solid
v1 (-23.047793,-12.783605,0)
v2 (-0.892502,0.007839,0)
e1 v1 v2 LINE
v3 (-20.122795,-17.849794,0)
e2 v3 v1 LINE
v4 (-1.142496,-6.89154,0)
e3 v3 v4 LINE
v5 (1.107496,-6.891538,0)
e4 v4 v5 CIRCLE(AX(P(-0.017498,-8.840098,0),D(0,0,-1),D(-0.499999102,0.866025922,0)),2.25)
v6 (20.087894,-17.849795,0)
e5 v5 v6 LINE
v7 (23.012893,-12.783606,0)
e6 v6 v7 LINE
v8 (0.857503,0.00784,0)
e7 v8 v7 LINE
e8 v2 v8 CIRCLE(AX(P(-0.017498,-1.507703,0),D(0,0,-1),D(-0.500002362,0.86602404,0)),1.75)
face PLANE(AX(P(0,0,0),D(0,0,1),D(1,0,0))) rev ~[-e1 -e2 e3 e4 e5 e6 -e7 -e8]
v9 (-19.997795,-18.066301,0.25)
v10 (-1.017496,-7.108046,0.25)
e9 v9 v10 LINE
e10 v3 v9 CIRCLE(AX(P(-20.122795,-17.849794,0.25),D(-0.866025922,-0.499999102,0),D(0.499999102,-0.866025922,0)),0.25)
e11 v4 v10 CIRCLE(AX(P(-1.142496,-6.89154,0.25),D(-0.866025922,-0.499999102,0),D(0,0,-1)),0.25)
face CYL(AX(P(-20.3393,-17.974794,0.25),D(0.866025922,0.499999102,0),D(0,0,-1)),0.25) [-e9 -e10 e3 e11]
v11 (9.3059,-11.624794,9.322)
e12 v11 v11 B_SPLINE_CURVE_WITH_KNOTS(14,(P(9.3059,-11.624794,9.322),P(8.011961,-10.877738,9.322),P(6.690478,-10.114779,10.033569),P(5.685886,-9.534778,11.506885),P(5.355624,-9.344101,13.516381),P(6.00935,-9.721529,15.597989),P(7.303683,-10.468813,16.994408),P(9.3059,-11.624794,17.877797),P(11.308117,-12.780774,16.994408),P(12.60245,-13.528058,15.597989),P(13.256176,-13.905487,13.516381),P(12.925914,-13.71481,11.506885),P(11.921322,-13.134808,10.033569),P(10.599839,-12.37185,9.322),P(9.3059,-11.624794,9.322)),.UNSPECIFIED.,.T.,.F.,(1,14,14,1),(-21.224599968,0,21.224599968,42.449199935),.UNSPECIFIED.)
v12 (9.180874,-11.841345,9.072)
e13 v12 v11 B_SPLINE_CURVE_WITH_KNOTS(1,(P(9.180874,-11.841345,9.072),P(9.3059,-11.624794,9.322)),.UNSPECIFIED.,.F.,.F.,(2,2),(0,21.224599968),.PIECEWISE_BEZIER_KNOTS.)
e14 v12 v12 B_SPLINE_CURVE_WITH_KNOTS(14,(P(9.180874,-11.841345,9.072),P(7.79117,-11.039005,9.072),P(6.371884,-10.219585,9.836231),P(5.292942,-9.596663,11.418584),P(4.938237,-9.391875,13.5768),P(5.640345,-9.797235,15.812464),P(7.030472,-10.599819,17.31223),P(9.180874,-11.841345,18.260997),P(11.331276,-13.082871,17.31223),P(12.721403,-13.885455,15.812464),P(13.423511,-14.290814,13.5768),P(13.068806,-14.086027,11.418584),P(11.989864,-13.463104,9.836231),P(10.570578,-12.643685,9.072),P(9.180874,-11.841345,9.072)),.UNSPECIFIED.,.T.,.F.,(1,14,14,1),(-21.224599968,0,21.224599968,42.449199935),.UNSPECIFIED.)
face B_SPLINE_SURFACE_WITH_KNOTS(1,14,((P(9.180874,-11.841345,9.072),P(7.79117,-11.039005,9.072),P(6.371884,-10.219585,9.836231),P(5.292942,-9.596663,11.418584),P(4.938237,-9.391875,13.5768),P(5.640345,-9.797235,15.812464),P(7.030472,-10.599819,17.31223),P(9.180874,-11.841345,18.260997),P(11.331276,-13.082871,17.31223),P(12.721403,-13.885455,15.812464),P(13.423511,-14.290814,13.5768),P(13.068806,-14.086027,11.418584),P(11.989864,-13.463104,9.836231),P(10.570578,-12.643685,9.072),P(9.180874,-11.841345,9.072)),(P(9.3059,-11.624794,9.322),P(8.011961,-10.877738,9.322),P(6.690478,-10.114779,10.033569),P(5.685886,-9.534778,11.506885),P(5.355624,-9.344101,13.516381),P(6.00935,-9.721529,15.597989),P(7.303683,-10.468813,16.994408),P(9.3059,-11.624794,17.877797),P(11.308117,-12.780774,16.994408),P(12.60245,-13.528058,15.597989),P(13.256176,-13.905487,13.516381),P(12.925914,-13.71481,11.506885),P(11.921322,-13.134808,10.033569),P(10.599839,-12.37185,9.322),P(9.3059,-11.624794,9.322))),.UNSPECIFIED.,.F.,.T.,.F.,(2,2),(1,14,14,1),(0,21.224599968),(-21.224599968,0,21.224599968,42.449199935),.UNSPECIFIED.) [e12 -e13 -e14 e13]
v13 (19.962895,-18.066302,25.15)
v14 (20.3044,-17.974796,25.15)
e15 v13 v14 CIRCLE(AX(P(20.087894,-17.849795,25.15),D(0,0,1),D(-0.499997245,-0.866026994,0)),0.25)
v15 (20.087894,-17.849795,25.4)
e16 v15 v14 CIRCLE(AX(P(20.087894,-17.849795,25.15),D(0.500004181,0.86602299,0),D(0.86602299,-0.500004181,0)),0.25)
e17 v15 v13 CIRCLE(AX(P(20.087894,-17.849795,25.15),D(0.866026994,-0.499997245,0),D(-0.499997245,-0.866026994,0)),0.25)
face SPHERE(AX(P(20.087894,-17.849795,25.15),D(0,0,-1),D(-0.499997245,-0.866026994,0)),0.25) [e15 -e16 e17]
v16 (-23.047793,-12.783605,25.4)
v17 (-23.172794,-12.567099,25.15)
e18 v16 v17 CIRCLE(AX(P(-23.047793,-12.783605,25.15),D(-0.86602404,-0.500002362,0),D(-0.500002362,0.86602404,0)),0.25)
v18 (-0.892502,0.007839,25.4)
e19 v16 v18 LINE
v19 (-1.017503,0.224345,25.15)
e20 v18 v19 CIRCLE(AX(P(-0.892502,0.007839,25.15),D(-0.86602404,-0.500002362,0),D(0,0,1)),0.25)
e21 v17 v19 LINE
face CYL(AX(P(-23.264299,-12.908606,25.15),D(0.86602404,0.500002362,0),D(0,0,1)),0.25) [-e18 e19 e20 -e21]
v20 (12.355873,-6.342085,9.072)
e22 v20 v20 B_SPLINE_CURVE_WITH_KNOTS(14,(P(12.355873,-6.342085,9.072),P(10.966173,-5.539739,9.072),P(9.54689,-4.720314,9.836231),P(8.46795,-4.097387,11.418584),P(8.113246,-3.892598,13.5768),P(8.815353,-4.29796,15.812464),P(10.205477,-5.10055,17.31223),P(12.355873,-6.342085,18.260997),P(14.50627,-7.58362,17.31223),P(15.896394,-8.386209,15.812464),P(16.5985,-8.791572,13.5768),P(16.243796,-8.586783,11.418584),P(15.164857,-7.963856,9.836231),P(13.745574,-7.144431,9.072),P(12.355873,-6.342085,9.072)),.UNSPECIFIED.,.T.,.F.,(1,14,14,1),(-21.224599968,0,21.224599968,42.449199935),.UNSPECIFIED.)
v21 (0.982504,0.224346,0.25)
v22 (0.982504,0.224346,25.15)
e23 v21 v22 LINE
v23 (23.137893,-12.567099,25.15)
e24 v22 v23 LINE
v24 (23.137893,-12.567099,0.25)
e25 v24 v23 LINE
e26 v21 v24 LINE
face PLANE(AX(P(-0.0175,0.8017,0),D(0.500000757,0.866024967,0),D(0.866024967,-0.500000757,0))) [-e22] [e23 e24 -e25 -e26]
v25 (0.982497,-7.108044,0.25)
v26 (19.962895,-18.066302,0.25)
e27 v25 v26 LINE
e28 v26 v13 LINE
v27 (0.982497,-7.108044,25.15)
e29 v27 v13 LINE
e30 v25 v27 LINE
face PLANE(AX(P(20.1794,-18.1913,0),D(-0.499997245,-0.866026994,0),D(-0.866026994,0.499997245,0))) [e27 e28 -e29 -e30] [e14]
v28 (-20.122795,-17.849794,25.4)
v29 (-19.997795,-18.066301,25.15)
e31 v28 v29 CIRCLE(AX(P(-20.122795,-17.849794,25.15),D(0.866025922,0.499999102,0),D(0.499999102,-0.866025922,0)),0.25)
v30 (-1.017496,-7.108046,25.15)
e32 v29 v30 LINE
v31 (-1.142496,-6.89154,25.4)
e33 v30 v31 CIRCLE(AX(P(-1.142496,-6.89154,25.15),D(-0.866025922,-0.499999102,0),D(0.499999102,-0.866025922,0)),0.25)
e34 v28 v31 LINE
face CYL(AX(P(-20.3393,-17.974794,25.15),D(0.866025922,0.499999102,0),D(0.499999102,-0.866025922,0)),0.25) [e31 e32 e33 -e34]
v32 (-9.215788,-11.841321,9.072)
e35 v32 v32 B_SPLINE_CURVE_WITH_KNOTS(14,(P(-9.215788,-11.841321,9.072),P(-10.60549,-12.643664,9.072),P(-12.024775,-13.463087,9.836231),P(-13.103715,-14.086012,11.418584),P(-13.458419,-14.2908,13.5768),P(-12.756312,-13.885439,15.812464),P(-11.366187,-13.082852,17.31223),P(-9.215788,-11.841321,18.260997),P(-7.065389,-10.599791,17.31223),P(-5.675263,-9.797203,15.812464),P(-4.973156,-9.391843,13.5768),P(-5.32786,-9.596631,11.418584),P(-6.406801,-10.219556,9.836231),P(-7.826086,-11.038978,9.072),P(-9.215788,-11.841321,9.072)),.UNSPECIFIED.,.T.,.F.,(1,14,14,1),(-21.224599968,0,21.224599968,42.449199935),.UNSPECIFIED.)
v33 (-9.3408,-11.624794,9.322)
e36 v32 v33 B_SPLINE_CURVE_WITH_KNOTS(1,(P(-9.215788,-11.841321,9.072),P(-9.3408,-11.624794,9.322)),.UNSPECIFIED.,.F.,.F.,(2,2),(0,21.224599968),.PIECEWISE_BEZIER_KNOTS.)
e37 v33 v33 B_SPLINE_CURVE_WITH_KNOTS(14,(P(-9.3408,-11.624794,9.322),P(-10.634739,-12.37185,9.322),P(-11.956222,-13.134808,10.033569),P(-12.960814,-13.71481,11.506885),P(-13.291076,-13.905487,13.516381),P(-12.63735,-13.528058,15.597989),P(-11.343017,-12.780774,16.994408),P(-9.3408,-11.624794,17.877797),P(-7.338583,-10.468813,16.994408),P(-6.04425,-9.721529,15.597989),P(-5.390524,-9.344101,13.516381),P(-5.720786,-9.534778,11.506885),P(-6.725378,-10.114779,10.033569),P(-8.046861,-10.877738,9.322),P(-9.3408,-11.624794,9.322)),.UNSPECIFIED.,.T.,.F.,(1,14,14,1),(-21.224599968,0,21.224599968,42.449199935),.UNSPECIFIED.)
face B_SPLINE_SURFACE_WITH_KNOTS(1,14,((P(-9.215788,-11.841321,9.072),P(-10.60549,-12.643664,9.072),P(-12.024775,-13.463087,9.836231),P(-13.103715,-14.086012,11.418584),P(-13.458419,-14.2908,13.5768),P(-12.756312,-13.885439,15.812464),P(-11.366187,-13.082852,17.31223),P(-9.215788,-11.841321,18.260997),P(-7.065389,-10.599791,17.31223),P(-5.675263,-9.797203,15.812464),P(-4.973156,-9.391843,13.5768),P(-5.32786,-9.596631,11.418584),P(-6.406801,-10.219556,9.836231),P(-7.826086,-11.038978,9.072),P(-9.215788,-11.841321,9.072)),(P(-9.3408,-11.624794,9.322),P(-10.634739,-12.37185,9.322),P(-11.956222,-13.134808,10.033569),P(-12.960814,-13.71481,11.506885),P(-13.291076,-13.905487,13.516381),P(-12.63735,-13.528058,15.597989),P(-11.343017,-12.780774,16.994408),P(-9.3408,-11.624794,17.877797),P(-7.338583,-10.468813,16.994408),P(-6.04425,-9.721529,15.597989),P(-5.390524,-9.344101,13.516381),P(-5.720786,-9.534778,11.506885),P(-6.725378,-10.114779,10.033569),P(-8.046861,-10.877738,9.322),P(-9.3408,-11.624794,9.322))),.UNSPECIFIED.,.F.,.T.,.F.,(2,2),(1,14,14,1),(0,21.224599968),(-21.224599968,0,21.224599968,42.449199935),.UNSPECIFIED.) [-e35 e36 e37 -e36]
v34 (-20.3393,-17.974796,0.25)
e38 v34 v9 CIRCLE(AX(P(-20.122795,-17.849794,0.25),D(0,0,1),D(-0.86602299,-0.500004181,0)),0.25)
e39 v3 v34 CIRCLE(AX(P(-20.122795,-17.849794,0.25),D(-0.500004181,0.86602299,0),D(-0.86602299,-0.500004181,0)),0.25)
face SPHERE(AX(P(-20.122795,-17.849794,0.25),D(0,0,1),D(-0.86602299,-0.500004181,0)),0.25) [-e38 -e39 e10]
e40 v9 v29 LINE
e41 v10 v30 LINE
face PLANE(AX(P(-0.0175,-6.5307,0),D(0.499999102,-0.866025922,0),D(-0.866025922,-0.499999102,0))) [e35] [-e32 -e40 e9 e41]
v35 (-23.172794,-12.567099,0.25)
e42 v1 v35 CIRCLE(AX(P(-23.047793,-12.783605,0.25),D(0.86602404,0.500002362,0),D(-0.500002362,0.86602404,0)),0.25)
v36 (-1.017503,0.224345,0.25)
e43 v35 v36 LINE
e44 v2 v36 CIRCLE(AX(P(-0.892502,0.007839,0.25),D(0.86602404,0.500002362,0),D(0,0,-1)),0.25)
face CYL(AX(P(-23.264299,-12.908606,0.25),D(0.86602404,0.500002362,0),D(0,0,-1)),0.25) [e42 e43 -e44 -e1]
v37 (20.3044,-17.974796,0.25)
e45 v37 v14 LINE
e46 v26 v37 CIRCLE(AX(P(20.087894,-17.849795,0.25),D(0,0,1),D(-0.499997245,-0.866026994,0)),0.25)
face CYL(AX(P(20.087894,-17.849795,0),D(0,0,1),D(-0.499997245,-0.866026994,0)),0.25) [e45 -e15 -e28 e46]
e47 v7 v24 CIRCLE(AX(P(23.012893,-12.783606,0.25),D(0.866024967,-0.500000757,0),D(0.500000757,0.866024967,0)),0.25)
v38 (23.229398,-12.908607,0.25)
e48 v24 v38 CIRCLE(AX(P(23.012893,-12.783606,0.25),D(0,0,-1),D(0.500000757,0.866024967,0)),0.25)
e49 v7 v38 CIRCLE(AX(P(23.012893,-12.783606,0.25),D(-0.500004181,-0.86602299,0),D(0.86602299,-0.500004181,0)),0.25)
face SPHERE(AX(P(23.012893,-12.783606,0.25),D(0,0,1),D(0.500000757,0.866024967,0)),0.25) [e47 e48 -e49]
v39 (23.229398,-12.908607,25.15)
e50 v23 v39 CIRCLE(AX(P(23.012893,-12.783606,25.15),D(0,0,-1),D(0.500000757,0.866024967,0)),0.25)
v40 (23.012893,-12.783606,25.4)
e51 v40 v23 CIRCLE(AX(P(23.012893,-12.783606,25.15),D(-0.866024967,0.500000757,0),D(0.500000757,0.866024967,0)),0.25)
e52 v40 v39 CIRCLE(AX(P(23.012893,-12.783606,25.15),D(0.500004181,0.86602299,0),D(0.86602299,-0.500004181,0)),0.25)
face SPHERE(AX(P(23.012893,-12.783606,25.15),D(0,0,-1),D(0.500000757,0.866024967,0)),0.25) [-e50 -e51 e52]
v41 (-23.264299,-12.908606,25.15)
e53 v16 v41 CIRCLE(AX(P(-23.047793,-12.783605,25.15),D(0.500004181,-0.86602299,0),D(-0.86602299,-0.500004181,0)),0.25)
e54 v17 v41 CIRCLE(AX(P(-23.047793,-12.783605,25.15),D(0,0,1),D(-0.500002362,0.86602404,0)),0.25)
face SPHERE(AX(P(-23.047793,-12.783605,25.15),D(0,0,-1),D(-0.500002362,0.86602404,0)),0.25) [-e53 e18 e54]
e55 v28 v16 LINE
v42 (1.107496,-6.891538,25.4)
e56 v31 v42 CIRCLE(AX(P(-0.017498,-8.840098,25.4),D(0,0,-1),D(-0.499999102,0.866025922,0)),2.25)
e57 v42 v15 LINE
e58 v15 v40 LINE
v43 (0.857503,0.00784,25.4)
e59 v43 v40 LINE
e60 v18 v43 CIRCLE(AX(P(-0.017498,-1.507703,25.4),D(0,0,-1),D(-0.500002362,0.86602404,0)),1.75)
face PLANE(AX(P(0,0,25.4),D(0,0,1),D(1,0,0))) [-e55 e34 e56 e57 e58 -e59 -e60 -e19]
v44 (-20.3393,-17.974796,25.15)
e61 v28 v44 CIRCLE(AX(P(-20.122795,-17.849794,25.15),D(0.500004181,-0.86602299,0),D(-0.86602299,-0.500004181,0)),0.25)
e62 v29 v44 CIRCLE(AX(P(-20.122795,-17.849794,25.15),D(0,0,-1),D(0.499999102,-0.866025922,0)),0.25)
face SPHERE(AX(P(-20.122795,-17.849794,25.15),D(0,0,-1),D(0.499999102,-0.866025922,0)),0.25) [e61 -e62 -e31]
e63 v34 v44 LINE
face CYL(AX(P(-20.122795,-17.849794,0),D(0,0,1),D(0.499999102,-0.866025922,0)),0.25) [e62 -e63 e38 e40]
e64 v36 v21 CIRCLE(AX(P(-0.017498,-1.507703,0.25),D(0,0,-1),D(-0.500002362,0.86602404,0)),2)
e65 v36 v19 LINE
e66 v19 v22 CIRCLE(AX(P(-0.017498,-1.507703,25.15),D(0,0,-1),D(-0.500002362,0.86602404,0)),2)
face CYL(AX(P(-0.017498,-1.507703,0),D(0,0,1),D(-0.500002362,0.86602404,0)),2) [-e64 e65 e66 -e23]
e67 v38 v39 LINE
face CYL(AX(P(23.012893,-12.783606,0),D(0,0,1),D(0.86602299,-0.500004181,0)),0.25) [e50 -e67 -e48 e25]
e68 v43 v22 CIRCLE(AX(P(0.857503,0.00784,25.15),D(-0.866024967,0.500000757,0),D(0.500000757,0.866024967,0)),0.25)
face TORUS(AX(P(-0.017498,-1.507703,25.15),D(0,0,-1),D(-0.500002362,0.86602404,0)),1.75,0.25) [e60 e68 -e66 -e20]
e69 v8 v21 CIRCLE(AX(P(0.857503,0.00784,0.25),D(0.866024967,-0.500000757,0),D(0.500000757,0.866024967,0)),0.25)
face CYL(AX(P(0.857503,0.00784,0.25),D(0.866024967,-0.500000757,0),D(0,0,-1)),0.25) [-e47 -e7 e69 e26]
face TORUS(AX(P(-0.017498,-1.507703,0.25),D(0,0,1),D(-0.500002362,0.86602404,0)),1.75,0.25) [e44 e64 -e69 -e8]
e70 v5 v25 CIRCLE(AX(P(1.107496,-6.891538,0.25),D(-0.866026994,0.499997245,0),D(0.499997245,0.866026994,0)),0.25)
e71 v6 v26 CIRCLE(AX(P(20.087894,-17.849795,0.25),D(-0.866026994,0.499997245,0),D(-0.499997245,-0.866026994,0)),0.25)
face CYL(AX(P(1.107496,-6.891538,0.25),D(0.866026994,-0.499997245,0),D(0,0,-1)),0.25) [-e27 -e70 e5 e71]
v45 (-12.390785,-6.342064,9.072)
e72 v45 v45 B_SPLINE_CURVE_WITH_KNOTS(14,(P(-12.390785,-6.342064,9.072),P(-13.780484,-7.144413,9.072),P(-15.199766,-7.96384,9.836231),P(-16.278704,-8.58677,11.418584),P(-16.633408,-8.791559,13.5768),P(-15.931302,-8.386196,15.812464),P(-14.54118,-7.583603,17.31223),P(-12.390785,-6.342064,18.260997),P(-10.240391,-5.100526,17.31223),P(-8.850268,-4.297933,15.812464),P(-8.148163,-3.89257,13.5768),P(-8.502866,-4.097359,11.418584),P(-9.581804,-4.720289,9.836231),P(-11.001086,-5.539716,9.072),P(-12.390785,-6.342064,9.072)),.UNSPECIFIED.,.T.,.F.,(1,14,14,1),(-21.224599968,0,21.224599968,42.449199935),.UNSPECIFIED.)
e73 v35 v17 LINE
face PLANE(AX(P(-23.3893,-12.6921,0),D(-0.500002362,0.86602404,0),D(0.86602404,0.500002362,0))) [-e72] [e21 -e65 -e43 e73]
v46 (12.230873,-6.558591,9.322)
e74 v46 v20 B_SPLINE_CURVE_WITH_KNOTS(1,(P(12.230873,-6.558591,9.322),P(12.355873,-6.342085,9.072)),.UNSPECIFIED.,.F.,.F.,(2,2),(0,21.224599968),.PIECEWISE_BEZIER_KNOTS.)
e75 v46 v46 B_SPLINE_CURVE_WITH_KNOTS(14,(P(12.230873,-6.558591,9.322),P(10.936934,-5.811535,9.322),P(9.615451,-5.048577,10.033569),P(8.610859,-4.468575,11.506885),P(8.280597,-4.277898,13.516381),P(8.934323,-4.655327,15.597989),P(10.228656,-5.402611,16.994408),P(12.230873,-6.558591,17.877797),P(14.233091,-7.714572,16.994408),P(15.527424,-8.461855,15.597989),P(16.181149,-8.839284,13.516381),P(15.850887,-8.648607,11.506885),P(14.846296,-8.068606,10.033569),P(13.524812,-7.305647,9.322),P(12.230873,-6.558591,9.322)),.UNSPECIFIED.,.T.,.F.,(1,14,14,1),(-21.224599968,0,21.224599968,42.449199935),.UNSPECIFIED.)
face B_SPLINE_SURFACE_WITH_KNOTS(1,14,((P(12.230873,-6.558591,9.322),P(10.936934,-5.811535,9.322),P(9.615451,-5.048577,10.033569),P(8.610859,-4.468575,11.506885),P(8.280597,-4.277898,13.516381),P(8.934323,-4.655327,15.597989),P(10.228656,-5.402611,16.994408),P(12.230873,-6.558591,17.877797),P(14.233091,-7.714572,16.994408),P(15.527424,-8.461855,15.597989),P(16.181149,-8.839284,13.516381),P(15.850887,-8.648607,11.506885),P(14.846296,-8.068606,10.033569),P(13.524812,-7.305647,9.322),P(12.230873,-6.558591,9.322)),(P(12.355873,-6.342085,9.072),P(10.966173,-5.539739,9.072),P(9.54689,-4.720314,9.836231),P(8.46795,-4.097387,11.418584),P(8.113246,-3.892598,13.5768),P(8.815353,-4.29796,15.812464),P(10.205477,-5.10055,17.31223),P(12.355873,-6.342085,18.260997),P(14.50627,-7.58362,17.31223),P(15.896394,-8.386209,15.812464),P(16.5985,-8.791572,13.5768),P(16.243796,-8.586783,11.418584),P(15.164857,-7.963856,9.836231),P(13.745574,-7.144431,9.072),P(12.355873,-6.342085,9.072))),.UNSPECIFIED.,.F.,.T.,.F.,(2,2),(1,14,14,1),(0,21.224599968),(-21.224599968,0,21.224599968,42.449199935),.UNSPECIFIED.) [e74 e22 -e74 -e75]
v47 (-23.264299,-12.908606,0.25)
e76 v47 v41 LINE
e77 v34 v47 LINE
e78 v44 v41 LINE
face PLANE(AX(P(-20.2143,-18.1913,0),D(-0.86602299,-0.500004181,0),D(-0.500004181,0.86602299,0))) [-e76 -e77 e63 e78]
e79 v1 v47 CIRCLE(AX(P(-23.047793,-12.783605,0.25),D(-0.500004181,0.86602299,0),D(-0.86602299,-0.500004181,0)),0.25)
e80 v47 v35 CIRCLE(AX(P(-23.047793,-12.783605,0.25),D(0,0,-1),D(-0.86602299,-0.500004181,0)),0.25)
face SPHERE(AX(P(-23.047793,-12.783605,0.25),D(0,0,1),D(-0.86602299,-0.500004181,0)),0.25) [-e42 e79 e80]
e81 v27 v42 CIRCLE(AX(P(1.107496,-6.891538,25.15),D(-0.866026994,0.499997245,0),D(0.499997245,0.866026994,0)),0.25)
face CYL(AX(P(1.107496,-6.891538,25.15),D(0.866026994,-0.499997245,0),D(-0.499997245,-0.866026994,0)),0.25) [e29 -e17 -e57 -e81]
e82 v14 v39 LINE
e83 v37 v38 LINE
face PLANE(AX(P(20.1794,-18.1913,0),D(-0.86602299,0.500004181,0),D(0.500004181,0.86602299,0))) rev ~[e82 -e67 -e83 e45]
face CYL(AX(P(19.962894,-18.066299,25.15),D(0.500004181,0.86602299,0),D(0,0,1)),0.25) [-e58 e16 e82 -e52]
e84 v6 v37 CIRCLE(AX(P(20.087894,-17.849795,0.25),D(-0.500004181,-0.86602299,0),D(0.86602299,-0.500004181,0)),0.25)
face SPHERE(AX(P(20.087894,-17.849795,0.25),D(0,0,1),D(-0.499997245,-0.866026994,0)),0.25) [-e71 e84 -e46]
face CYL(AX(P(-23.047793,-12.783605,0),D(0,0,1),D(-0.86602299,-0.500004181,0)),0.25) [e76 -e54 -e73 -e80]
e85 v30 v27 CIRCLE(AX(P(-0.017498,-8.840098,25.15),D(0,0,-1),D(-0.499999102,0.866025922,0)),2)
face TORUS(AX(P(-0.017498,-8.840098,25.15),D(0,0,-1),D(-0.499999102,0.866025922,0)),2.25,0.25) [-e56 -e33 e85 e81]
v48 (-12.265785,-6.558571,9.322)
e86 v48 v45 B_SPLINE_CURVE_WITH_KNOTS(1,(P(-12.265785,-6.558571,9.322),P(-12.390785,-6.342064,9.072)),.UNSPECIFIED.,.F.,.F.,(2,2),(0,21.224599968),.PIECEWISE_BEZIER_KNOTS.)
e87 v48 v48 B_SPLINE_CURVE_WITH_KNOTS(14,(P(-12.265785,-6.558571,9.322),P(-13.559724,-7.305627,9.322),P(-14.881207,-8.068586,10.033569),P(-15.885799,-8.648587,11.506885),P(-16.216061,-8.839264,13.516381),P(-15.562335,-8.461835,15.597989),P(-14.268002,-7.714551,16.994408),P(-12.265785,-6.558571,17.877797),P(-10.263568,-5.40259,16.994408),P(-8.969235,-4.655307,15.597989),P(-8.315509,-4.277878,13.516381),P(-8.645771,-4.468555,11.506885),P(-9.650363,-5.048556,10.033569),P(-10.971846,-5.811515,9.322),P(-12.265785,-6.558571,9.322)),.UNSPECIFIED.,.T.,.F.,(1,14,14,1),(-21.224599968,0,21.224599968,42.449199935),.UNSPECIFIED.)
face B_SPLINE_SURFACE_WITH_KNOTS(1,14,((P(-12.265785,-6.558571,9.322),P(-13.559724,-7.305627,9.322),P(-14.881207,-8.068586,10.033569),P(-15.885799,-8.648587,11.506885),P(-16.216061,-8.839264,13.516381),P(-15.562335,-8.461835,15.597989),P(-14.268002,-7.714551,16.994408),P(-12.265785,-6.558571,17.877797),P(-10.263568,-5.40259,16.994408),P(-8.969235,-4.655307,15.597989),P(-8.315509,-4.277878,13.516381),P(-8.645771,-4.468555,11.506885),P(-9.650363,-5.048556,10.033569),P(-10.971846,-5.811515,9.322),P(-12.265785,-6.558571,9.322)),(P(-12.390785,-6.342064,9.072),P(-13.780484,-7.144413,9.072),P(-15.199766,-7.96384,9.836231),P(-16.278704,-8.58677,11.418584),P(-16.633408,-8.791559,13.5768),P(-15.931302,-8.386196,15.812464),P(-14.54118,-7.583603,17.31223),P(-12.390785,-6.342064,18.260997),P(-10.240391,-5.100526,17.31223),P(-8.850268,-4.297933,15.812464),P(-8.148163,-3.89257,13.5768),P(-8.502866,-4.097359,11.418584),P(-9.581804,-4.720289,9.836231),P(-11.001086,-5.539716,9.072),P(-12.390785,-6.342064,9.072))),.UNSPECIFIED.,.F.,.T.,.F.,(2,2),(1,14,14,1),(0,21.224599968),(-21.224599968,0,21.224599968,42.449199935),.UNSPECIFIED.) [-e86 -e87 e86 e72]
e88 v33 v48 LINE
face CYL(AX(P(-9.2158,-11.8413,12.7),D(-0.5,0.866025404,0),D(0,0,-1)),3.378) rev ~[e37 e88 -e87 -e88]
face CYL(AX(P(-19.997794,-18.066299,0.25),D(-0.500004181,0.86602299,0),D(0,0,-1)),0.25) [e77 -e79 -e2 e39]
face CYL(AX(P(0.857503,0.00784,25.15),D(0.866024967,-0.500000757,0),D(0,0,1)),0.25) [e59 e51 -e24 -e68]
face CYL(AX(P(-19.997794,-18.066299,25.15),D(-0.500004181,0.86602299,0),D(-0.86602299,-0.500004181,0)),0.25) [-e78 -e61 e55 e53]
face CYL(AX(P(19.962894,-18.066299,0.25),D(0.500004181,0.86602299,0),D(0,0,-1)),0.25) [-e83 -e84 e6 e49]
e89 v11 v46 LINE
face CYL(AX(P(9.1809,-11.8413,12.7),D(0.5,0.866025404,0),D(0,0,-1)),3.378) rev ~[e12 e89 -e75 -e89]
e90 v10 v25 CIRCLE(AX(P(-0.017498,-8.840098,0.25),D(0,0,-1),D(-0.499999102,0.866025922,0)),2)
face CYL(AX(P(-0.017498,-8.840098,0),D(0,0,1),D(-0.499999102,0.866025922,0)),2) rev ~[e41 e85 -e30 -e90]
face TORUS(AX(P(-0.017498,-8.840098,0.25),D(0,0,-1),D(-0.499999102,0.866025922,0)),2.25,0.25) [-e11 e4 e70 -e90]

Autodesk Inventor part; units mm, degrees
ref_plane "YZ Plane" through (0, 0, 0) normal (1, 0, 0) x (0, 1, 0)
ref_plane "XZ Plane" through (0, 0, 0) normal (0, 1, 0) x (-1, 0, 0)
ref_plane "XY Plane" through (0, 0, 0) normal (0, 0, 1) x (1, 0, 0)
sketch "Sketch1" plane through (0, 0, 0) normal (0, 0, 1) x (1, 0, 0)
  line L0 (-0.0175, -6.5307) -> (-20.2143, -18.1913)
  line L1 (-23.3893, -12.6921) -> (-0.0175, 0.8017)
  line L2 (-0.0175, 0.8017) -> (23.3544, -12.6921)
  line L3 (20.1794, -18.1913) -> (-0.0175, -6.5307)
  line L4 (-0.0175, 0.8017) -> (-0.0175, -6.5307) construction
  line L5 (-20.2143, -18.1913) -> (-23.3893, -12.6921)
  line L6 (20.1794, -18.1913) -> (23.3544, -12.6921)
  dimension "d4" = 120
  dimension "d5" = 6.35
  dimension "d6" = 26.9875
extrude "Extrusion1" add sketch "Sketch1" along normal blind 25.4
hole "Hole1" at (9.1809, -11.8413, 12.7) direction (0.5, 0.8660254, 0) diameter 6.756 end through all clearance for "Flat Head Machine Screw (82)" size "1/4" standard "Ansi Unified Screw Threads"
hole "Hole2" at (-9.2158, -11.8413, 12.7) direction (-0.5, 0.8660254, 0) diameter 6.756 end through all clearance for "Flat Head Machine Screw (82)" size "1/4" standard "Ansi Unified Screw Threads"
fillet "Fillet1" radius 2 2 edges at (-0.0175, -6.5307, 12.7) (-0.0175, 0.8017, 12.7)
fillet "Fillet2" radius 0.25 20 edges at (-23.3893, -12.6921, 12.7) (-20.2143, -18.1913, 12.7) (20.1794, -18.1913, 12.7) (23.3544, -12.6921, 12.7) (-0.0175, 0.4923, 25.4) (-12.2034, -6.2339, 25.4) (12.1685, -6.2339, 25.4) (-0.0175, -6.8401, 25.4) (-10.6159, -12.6497, 25.4) (10.581, -12.6497, 25.4) (-21.8018, -15.4417, 25.4) (21.7669, -15.4417, 25.4) (-21.8018, -15.4417, 0) (-0.0175, 0.4923, 0) (12.1685, -6.2339, 0) (-12.2034, -6.2339, 0) (-0.0175, -6.8401, 0) (10.581, -12.6497, 0) (-10.6159, -12.6497, 0) (21.7669, -15.4417, 0)
chamfer "Chamfer1" distance 0.25 angle 45 4 edges at (-9.2158, -11.8413, 16.078) (9.1809, -11.8413, 16.078) (-12.3908, -6.3421, 16.078) (12.3559, -6.3421, 16.078)
properties part number "drive_frame_bracket" material "Aluminum-6061"
